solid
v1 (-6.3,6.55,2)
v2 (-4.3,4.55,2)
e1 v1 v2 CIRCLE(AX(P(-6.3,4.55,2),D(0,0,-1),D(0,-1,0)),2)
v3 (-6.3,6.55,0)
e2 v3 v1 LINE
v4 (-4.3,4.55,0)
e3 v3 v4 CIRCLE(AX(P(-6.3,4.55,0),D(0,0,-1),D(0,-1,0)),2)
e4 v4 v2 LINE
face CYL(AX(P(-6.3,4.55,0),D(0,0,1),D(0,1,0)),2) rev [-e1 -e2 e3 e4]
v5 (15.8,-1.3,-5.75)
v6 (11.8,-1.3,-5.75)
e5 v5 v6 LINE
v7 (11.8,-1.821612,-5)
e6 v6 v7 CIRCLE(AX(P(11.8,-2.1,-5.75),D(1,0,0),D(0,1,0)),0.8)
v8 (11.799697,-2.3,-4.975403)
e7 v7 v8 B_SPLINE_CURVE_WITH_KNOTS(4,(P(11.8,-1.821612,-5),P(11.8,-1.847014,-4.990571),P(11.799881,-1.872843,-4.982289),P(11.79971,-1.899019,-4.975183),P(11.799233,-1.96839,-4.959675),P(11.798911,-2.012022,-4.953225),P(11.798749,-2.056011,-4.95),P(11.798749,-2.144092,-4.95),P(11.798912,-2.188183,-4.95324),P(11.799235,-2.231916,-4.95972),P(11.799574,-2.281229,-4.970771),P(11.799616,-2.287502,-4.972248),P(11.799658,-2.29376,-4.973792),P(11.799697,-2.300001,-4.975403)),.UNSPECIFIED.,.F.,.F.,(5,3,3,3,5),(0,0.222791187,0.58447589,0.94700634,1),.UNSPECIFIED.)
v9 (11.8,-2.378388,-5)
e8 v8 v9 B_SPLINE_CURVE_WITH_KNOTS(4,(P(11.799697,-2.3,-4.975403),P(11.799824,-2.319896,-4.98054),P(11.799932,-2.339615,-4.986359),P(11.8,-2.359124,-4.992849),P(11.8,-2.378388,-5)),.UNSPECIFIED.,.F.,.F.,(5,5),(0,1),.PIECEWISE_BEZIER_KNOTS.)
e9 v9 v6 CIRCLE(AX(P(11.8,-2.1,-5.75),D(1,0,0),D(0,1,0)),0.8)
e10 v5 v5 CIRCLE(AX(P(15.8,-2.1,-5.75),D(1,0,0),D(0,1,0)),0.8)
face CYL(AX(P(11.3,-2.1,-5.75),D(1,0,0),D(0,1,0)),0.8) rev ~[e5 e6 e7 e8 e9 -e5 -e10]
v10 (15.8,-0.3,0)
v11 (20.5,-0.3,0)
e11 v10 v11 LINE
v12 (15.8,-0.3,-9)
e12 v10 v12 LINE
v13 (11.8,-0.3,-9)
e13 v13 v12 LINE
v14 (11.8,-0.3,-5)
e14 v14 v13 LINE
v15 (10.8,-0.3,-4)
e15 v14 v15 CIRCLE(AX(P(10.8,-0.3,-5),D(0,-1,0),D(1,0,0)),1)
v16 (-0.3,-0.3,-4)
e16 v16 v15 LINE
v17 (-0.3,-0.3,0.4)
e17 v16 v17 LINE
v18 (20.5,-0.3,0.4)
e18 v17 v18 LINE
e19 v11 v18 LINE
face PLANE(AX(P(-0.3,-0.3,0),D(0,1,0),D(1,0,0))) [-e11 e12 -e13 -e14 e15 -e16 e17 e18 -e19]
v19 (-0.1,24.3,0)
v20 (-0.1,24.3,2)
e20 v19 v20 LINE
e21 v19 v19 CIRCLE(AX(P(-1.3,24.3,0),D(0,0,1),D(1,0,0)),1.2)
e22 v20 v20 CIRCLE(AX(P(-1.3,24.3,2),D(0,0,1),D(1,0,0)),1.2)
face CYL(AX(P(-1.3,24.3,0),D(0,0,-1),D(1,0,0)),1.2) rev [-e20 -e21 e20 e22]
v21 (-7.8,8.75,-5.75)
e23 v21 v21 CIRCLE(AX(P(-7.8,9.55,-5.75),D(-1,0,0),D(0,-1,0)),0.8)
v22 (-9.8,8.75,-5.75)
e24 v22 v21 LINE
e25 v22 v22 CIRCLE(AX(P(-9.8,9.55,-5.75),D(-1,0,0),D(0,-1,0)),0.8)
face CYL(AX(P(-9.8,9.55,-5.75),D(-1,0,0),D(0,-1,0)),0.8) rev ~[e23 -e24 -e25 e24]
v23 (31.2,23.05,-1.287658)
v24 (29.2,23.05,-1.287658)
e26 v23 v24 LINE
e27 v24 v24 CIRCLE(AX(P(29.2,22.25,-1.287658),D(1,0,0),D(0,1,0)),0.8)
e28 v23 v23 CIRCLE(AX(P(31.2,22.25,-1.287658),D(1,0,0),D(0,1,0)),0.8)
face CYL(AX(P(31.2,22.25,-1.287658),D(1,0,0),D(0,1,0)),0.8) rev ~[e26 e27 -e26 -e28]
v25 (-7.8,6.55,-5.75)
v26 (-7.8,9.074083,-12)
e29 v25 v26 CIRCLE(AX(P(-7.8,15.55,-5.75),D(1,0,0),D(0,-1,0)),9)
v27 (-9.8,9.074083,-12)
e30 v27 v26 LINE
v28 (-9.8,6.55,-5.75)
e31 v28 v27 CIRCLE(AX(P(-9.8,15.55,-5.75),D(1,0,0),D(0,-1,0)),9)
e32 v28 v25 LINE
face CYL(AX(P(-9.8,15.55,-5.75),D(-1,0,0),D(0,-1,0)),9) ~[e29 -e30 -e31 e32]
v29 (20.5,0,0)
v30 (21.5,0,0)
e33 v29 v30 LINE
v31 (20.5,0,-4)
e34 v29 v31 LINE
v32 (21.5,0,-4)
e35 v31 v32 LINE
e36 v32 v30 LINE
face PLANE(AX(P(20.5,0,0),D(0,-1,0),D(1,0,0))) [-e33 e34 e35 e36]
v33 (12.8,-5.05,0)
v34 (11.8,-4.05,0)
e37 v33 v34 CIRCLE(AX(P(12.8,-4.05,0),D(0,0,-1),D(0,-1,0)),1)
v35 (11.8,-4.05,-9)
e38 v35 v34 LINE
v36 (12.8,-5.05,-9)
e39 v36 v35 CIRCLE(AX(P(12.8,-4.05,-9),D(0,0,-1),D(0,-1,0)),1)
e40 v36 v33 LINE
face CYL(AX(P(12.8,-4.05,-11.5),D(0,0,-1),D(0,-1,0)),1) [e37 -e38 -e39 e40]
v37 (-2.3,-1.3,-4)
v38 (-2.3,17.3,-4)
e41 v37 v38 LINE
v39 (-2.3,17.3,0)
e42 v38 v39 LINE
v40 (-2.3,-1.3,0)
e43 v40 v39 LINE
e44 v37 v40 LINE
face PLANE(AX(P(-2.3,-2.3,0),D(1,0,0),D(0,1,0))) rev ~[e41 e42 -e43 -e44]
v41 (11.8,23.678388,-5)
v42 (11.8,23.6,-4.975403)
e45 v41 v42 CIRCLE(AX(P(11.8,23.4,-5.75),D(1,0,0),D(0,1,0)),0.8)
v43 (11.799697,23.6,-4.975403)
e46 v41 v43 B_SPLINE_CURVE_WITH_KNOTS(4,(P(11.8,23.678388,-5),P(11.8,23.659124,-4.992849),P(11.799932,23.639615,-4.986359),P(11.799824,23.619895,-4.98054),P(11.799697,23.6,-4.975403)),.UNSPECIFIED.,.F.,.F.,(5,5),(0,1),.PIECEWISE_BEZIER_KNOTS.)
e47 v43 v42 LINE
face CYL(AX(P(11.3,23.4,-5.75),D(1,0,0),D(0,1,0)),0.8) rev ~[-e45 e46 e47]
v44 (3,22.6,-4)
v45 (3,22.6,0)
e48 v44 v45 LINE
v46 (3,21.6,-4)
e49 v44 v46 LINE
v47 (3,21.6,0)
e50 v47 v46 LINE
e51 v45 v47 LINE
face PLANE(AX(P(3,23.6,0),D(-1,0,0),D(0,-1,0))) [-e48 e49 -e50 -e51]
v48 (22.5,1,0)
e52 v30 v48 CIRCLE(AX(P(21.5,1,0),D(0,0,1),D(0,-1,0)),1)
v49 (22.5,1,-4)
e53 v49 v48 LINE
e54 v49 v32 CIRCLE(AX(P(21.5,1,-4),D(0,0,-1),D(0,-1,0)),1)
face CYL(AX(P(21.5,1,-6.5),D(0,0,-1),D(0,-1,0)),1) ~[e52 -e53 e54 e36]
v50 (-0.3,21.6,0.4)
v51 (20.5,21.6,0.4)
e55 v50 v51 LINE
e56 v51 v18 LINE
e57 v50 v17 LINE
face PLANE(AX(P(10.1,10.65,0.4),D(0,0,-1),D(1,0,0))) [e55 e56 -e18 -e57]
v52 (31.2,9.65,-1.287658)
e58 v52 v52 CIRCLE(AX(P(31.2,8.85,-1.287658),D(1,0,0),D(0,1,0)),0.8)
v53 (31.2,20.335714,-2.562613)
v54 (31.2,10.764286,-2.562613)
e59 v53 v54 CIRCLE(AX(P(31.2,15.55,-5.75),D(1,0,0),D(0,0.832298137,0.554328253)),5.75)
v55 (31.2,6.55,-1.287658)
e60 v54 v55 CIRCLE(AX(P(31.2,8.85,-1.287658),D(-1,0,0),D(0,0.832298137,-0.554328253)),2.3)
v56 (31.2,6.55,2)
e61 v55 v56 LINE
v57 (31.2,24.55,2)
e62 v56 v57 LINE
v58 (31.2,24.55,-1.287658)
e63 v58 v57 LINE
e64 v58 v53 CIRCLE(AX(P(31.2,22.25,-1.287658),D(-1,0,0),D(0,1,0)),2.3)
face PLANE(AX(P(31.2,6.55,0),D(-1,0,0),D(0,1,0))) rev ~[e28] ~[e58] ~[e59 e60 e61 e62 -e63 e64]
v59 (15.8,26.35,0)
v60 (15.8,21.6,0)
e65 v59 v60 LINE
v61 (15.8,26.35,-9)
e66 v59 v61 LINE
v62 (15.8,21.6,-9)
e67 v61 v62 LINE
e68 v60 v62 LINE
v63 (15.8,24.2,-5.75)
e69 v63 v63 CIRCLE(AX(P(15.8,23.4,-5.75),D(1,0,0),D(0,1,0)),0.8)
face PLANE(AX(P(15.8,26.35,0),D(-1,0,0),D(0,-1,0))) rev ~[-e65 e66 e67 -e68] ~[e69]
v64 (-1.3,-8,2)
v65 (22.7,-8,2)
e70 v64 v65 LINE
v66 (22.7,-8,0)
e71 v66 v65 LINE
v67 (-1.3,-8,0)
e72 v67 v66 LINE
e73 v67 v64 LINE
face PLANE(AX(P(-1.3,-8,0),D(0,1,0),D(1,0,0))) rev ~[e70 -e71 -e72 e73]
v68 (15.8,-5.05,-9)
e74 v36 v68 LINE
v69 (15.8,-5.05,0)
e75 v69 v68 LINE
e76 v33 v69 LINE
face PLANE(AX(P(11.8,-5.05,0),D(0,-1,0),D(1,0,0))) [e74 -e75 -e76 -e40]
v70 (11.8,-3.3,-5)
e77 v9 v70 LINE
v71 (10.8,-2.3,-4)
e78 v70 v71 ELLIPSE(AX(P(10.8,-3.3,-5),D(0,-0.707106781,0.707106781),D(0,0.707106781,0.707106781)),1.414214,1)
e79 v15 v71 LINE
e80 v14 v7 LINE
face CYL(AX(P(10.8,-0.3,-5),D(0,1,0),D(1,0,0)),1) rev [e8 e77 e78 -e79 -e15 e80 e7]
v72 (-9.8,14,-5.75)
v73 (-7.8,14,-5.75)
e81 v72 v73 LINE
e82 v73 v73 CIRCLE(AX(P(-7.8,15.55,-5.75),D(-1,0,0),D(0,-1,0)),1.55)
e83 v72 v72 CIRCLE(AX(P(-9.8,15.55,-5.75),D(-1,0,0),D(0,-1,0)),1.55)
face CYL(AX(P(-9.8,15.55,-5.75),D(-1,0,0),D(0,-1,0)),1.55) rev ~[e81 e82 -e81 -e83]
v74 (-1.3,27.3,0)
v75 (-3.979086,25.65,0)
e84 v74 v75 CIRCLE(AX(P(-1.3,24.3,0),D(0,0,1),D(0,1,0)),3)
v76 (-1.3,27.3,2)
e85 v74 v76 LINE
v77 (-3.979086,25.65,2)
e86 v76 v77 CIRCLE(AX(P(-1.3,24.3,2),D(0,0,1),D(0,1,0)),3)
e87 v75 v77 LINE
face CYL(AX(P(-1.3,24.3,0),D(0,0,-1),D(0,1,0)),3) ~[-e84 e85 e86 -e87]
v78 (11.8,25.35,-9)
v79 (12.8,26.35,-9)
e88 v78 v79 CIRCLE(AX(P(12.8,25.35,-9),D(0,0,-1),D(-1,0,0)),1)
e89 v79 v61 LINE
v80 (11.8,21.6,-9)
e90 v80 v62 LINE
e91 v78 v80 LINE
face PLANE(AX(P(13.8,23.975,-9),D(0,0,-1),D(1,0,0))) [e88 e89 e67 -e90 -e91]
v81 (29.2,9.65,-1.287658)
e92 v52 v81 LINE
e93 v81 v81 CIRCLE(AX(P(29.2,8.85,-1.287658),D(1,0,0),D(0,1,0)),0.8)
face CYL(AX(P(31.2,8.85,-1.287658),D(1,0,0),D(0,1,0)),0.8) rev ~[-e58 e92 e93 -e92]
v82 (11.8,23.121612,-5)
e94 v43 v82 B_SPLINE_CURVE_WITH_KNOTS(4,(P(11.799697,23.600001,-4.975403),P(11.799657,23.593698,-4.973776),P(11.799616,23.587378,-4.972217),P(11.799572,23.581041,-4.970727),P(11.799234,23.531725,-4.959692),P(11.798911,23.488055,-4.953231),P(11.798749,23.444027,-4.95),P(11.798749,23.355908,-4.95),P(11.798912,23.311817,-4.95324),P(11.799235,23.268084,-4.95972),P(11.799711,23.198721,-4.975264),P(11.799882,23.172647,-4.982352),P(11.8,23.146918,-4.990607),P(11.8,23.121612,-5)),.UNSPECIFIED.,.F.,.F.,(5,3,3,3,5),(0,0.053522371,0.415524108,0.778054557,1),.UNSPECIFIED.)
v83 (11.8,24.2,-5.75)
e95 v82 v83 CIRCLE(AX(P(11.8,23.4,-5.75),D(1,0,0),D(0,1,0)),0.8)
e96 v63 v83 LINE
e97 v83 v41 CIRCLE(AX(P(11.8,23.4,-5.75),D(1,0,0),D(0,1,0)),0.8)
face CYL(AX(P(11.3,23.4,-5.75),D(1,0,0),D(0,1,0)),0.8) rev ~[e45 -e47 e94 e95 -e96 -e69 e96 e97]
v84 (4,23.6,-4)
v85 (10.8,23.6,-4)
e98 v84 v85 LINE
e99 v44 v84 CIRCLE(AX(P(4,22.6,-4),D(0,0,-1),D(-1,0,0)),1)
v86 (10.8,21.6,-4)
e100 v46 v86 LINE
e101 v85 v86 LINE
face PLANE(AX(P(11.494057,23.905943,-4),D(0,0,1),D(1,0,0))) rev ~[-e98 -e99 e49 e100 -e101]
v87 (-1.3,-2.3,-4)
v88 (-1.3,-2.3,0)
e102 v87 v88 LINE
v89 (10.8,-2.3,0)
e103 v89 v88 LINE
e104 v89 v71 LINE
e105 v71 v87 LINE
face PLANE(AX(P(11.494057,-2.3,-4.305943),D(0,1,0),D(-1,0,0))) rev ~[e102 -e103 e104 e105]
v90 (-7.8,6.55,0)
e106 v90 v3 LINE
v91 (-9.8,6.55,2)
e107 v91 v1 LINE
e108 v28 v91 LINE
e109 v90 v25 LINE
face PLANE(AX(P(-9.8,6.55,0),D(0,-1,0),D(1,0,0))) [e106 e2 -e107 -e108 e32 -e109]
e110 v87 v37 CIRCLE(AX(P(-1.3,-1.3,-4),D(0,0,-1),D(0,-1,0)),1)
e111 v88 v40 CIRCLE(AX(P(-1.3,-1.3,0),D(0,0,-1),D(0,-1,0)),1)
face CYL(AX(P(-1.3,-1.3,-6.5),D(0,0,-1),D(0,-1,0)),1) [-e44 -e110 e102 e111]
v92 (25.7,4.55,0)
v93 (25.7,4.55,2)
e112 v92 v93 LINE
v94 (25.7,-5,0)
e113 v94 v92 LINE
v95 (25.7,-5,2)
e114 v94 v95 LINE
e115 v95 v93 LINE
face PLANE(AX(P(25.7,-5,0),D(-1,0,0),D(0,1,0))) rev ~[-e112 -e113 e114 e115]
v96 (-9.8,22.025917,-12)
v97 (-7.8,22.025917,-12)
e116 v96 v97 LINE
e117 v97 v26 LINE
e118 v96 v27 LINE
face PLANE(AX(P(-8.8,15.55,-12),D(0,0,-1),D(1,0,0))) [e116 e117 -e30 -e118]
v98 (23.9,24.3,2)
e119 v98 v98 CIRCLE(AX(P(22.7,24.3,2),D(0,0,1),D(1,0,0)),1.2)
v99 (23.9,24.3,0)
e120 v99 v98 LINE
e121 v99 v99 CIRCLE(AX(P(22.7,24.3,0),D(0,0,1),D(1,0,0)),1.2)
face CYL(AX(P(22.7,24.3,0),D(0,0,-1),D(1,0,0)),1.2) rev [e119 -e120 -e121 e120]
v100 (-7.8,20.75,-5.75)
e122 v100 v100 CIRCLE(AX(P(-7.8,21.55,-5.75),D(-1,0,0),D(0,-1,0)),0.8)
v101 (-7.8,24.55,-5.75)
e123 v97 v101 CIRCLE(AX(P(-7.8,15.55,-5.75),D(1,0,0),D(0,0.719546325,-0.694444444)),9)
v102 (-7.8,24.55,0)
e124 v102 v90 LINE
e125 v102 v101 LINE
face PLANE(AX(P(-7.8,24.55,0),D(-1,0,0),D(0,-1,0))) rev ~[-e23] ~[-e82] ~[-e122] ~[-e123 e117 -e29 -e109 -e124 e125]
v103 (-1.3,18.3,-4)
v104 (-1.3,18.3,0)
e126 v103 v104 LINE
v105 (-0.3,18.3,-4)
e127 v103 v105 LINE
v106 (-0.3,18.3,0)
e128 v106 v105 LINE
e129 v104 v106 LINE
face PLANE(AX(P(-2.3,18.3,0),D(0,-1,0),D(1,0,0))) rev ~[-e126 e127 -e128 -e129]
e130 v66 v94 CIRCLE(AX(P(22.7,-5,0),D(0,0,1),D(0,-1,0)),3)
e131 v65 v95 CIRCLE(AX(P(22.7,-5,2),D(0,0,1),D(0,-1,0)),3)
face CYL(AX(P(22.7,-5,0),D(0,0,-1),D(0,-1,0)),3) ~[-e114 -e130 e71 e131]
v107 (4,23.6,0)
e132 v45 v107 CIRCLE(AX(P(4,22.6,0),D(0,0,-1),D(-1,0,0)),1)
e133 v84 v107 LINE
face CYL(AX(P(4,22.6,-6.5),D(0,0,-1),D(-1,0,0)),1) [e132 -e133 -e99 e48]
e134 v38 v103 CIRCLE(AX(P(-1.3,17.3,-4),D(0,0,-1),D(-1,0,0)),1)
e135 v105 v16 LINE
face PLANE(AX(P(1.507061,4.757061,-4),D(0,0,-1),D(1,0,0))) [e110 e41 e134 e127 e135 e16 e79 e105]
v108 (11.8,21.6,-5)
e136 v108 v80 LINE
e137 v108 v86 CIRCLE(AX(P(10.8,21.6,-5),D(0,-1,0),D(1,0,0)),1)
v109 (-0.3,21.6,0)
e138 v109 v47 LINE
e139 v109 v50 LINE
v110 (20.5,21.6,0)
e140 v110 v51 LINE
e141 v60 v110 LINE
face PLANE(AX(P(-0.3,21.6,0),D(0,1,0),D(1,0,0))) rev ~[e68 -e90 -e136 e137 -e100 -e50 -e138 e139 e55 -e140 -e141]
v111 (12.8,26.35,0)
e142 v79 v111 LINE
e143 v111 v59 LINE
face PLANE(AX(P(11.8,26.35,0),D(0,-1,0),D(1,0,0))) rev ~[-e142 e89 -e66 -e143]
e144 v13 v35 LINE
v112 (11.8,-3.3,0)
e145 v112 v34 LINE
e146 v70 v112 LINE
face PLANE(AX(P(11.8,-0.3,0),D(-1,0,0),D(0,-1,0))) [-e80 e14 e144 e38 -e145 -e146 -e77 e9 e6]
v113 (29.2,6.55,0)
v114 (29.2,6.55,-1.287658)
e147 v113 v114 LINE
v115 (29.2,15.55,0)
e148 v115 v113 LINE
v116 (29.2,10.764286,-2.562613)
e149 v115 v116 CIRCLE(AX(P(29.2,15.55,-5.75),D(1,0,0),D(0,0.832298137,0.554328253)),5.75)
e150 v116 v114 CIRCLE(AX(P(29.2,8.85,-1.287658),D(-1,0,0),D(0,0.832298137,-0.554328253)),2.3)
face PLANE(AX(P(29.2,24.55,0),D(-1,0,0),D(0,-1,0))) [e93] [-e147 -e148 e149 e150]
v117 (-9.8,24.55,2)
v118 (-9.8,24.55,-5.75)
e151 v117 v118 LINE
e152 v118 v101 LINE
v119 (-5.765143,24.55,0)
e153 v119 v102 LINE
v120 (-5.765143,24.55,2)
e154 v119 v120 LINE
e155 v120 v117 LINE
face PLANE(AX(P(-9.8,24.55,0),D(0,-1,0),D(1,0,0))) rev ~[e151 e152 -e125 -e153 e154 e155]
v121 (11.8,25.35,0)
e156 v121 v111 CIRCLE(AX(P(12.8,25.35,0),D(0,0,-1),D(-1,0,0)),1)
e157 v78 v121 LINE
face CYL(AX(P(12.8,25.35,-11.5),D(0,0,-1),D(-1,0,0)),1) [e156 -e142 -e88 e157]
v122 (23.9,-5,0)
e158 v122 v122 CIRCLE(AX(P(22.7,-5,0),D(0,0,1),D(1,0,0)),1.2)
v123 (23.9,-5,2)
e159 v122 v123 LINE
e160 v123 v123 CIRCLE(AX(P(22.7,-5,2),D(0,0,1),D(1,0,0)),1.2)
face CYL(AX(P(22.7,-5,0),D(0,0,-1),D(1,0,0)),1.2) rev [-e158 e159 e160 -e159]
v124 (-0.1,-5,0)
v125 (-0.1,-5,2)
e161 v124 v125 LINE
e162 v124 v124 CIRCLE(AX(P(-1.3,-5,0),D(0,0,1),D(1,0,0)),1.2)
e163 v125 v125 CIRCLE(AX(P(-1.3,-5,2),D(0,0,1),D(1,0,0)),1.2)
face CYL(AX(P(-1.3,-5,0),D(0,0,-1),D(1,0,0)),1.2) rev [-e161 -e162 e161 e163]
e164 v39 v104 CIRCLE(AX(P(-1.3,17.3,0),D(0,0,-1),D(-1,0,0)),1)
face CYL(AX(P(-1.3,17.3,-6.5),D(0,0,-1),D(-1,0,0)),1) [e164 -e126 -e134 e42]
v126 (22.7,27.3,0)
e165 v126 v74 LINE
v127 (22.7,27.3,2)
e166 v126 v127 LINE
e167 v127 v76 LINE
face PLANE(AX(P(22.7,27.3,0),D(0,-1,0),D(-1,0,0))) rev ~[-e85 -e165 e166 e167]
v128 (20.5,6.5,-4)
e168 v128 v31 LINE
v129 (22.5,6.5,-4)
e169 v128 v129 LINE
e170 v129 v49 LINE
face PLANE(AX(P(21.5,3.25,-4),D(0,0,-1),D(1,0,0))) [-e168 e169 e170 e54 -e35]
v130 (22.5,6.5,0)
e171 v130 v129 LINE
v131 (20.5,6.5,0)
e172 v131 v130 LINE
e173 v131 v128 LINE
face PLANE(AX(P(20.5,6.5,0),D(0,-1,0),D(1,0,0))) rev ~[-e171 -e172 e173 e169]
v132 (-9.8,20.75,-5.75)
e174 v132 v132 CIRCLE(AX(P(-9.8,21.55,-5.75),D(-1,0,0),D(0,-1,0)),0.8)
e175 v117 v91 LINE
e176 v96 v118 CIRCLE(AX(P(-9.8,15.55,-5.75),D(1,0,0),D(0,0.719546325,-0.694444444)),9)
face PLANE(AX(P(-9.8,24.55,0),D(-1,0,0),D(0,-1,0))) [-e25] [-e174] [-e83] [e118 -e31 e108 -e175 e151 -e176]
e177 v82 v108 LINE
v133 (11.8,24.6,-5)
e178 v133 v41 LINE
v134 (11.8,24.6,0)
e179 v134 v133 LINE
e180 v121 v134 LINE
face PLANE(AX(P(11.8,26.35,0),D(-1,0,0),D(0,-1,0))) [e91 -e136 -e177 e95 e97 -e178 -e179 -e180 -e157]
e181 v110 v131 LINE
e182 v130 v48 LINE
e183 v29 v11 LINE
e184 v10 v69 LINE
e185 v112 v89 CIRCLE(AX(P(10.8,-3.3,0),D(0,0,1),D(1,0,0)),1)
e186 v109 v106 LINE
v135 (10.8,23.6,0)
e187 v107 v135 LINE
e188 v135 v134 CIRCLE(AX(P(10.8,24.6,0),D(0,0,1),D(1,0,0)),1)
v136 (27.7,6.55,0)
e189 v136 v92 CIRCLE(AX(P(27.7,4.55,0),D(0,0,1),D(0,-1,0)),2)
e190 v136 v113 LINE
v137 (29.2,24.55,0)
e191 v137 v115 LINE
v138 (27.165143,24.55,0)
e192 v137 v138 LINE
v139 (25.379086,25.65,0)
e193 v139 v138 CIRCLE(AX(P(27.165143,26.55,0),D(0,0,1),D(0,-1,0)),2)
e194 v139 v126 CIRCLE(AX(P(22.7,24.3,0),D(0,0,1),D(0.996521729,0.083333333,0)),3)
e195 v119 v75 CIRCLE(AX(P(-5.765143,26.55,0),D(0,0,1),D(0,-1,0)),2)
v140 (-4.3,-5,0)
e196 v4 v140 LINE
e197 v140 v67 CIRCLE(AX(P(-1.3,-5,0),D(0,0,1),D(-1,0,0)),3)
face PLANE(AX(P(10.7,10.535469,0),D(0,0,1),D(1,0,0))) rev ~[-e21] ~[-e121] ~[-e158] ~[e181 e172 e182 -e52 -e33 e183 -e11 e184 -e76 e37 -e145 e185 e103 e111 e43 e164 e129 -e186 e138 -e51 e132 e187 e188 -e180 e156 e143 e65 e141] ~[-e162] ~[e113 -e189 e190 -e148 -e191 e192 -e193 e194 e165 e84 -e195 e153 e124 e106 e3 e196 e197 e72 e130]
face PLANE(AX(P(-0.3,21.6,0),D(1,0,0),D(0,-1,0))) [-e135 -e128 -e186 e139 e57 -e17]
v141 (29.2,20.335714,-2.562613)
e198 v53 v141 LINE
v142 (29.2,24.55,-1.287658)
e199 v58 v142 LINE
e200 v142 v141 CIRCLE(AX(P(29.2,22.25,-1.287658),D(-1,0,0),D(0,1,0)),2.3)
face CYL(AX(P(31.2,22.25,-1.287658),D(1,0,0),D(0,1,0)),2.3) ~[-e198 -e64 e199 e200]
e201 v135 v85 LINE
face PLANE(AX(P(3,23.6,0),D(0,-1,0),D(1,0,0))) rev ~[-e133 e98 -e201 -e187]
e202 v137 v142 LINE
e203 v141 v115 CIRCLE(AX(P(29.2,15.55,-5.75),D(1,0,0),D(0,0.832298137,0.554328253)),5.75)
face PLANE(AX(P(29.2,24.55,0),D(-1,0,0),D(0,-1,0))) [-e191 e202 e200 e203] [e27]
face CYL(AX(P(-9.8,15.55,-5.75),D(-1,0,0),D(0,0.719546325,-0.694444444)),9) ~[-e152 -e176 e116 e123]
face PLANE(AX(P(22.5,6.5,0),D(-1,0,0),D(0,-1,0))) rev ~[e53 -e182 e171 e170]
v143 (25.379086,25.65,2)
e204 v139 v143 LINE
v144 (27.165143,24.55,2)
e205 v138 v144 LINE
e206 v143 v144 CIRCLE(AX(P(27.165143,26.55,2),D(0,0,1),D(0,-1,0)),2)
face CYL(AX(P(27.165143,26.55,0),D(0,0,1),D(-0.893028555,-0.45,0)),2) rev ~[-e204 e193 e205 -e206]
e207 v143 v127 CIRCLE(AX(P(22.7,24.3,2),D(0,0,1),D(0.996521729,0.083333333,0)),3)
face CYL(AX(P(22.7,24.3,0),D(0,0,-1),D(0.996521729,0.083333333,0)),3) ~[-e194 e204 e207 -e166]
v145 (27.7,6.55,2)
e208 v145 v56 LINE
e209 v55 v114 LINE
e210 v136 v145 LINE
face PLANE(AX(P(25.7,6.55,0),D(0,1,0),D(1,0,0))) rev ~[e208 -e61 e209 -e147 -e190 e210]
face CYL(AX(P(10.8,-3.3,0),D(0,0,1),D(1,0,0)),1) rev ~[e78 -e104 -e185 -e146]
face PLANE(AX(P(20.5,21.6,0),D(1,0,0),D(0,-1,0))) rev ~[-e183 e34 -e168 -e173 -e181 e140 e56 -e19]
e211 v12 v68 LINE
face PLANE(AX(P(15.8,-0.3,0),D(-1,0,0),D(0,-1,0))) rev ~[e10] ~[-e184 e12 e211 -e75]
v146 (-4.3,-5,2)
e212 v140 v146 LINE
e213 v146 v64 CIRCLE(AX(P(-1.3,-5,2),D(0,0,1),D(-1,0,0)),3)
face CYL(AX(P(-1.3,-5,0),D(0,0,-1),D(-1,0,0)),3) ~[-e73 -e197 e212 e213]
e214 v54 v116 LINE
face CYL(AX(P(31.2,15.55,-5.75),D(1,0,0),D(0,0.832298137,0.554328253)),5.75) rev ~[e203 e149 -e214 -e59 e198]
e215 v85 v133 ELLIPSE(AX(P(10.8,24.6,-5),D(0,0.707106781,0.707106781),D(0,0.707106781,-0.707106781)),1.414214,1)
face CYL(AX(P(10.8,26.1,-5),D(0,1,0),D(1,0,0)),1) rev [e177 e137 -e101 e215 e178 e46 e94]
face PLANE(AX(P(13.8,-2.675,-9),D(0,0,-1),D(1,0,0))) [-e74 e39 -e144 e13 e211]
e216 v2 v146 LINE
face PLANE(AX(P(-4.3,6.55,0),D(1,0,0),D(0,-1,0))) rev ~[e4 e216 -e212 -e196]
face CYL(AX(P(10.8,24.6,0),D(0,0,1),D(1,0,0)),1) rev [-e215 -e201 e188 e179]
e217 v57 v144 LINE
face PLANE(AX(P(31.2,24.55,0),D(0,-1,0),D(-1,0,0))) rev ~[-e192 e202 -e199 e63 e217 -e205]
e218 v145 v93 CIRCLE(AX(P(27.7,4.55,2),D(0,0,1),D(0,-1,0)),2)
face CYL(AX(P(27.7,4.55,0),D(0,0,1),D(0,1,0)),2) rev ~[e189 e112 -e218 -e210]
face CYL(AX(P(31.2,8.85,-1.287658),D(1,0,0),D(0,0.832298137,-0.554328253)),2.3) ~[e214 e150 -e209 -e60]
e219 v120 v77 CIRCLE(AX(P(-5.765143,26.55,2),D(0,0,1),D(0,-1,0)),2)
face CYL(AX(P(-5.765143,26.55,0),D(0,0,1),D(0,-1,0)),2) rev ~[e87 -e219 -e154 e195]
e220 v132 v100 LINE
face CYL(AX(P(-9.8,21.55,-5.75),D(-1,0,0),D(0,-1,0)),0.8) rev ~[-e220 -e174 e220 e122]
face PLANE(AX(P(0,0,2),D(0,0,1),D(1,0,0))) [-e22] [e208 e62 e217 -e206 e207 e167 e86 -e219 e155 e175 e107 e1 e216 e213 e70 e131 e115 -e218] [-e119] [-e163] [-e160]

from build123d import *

# Parameters (mm, degrees)
F1_R          = 1.2
F2_DEPTH      = 2
F3_R          = 2
F4_W          = 4
F4_H          = 4.75
F5_DEPTH      = 9
F6_W          = 8.8
F6_H          = 2
F6_W_2        = 2
F6_H_2        = 6.5
F7_DEPTH      = 4
F8_R          = 0.8
F9_DEPTH      = 4
F10_T4_DEPTH  = 2
F10_S5_R      = 0.8
F10_T6_DEPTH  = 3
F10_T10_DEPTH = 6.5
F10_T15_DEPTH = 6.5
F10_T20_DEPTH = 2
F10_S21_R     = 0.8
F10_T22_DEPTH = 3
F10_T27_DEPTH = 6.5
F10_S29_R     = 0.8
F10_T30_DEPTH = 5
F10_T33_DEPTH = 4.5
F10_T40_DEPTH = 4.5
F10_T44_DEPTH = 6.5
F10_S46_R     = 0.8
F10_T47_DEPTH = 5
F10_T49_DEPTH = 6.5
F10_T51_DEPTH = 11.5
F11_W         = 2
F11_H         = 18
F12_DEPTH     = 12
F13_R         = 1.55
F13_R_2       = 0.8
F14_DEPTH     = 2
F15_R         = 0.8
F16_DEPTH     = 2
F18_W         = 20.8
F18_H         = 21.9
F19_DEPTH     = 0.4


# Not quite as in the source:
# - a fillet or chamfer that OpenCascade refuses, or shapes differently, is made with other operations: its cross-section is extruded or revolved along the edge and cut away or added
# - two fillets or chamfers of one size are made in one step


with BuildPart() as f2:
    # F1 (on Top) → F2 (new body)
    with BuildSketch(Plane.XY):
        with BuildLine():
            Line((-4.2895651858, 24.55), (-9.8, 24.55))
            Line((-9.8, 24.55), (-9.8, 6.55))
            Line((-9.8, 6.55), (-4.3, 6.55))
            Line((-4.3, 6.55), (-4.3, -5))
            ThreePointArc((-4.3, -5), (-3.4213203436, -7.1213203436), (-1.3, -8))
            Line((-1.3, -8), (22.7, -8))
            ThreePointArc((22.7, -8), (24.8213203436, -7.1213203436), (25.7, -5))
            Line((25.7, -5), (25.7, 6.55))
            Line((25.7, 6.55), (31.2, 6.55))
            Line((31.2, 6.55), (31.2, 24.55))
            Line((31.2, 24.55), (25.6895651858, 24.55))
            ThreePointArc((25.6895651858, 24.55), (24.7310096012, 26.5079402166), (22.7, 27.3))
            Line((22.7, 27.3), (-1.3, 27.3))
            ThreePointArc((-1.3, 27.3), (-3.3310096012, 26.5079402166), (-4.2895651858, 24.55))
        make_face()
        with Locations((-1.3, -5)):
            Circle(F1_R, mode=Mode.SUBTRACT)
        with Locations((22.7, -5)):
            Circle(F1_R, mode=Mode.SUBTRACT)
        with Locations((-1.3, 24.3)):
            Circle(F1_R, mode=Mode.SUBTRACT)
        with Locations((22.7, 24.3)):
            Circle(F1_R, mode=Mode.SUBTRACT)
    extrude(amount=F2_DEPTH)

    # F3
    f3_edges = [f2.edges().sort_by_distance(p)[0] for p in [
        (-4.289565, 24.55, 1),
        (-4.3, 6.55, 1),
        (25.7, 6.55, 1),
        (25.689565, 24.55, 1),
    ]]
    fillet(f3_edges, radius=F3_R)

    # F4 (on face) → F5 (join)
    with BuildSketch(Plane(origin=(0, 0, 0), x_dir=(1, 0, 0), z_dir=(0, 0, -1))):
        with Locations((13.8, 2.675)):
            Rectangle(F4_W, F4_H)
        with Locations((13.8, -23.975)):
            Rectangle(F4_W, F4_H)
    extrude(amount=F5_DEPTH)

    # F6 (on face) → F7 (join)
    with BuildSketch(Plane(origin=(0, 0, 0), x_dir=(1, 0, 0), z_dir=(0, 0, -1))):
        Polygon((-2.3, -18.3), (-0.3, -18.3), (-0.3, 0.3), (11.8, 0.3), (11.8, 2.3), (-2.3, 2.3), align=None)
        with Locations((7.4, -22.6)):
            Rectangle(F6_W, F6_H)
        with Locations((21.5, -3.25)):
            Rectangle(F6_W_2, F6_H_2)
    extrude(amount=F7_DEPTH)

    # F8 (on face) → F9 (cut, through all)
    with BuildSketch(Plane.YZ.offset(15.8)):
        with Locations((23.4, -5.75)):
            Circle(F8_R)
        with Locations((-2.1, -5.75)):
            Circle(F8_R)
    extrude(amount=-F9_DEPTH, mode=Mode.SUBTRACT)

    # F10: fillet of radius 1 on 10 edges, made by hand


with BuildPart() as f10_tool2:
    # F10_s3 → F10_t4 (new body)
    with BuildSketch(Plane.XZ.offset(0.3)):
        with BuildLine():
            ThreePointArc((11.8, -5), (11.5071067812, -4.2928932188), (10.8, -4))
            Line((10.8, -4), (11.8, -4))
            Line((11.8, -4), (11.8, -5))
        make_face()
    extrude(amount=F10_T4_DEPTH)

    # F10_s5 → F10_t6 (cut, symmetric)
    with BuildSketch(Plane.YZ.offset(11.3)):
        with Locations((-2.1, -5.75)):
            Circle(F10_S5_R)
    extrude(amount=F10_T6_DEPTH, both=True, mode=Mode.SUBTRACT)


with BuildPart() as f2_1:
    add(f2.part)

    # F10_t1: union F10_tool2
    add(f10_tool2.part)


with BuildPart() as f10_tool8:
    # F10_s9 → F10_t10 (new body)
    with BuildSketch(Plane.XY.offset(2.5)):
        with BuildLine():
            ThreePointArc((11.8, -3.3), (11.5071067812, -2.5928932188), (10.8, -2.3))
            Line((10.8, -2.3), (11.8, -2.3))
            Line((11.8, -2.3), (11.8, -3.3))
        make_face()
    extrude(amount=-F10_T10_DEPTH)

    split(bisect_by=Plane.XY.offset(2), keep=Keep.BOTTOM)


with BuildPart() as f2_2:
    add(f2_1.part)

    # F10_t7: union F10_tool8
    add(f10_tool8.part)


with BuildPart() as f10_tool13:
    # F10_s14 → F10_t15 (new body)
    with BuildSketch(Plane.XY.offset(2.5)):
        with BuildLine():
            ThreePointArc((11.8, 24.6), (11.5071067812, 23.8928932188), (10.8, 23.6))
            Line((10.8, 23.6), (11.8, 23.6))
            Line((11.8, 23.6), (11.8, 24.6))
        make_face()
    extrude(amount=-F10_T15_DEPTH)

    split(bisect_by=Plane.XY.offset(2), keep=Keep.BOTTOM)


with BuildPart() as f2_3:
    add(f2_2.part)

    # F10_t12: union F10_tool13
    add(f10_tool13.part)


with BuildPart() as f10_tool18:
    # F10_s19 → F10_t20 (new body)
    with BuildSketch(Plane.XZ.offset(-23.6)):
        with BuildLine():
            ThreePointArc((11.8, -5), (11.5071067812, -4.2928932188), (10.8, -4))
            Line((10.8, -4), (11.8, -4))
            Line((11.8, -4), (11.8, -5))
        make_face()
    extrude(amount=F10_T20_DEPTH)

    # F10_s21 → F10_t22 (cut, symmetric)
    with BuildSketch(Plane.YZ.offset(11.3)):
        with Locations((23.4, -5.75)):
            Circle(F10_S21_R)
    extrude(amount=F10_T22_DEPTH, both=True, mode=Mode.SUBTRACT)


with BuildPart() as f2_4:
    add(f2_3.part)

    # F10_t17: union F10_tool18
    add(f10_tool18.part)


with BuildPart() as f10_tool25:
    # F10_s26 → F10_t27 (new body)
    with BuildSketch(Plane.XY):
        with BuildLine():
            ThreePointArc((11.8, -3.3), (11.5071067812, -2.5928932188), (10.8, -2.3))
            Line((10.8, -2.3), (11.8, -2.3))
            Line((11.8, -2.3), (11.8, -3.3))
        make_face()
    extrude(amount=-F10_T27_DEPTH)

    split(bisect_by=Plane.XY.offset(-4), keep=Keep.BOTTOM)

    # F10_s29 → F10_t30 (cut, symmetric)
    with BuildSketch(Plane.YZ.offset(11.3)):
        with Locations((-2.1, -5.75)):
            Circle(F10_S29_R)
    extrude(amount=F10_T30_DEPTH, both=True, mode=Mode.SUBTRACT)


with BuildPart() as f10_tool31:
    # F10_s32 → F10_t33 (new body)
    with BuildSketch(Plane.XZ.offset(0.3)):
        with BuildLine():
            ThreePointArc((11.8, -5), (11.5071067812, -4.2928932188), (10.8, -4))
            Line((10.8, -4), (11.8, -4))
            Line((11.8, -4), (11.8, -5))
        make_face()
    extrude(amount=F10_T33_DEPTH)

    split(bisect_by=Plane.XZ.offset(2.3), keep=Keep.TOP)


with BuildPart() as f10_tool25_1:
    add(f10_tool25.part)

    # F10_t35: intersect F10_tool31
    add(f10_tool31.part, mode=Mode.INTERSECT)


with BuildPart() as f2_5:
    add(f2_4.part)

    # F10_t23: union F10_tool25
    add(f10_tool25_1.part)


with BuildPart() as f10_tool38:
    # F10_s39 → F10_t40 (new body)
    with BuildSketch(Plane.XZ.offset(-26.1)):
        with BuildLine():
            ThreePointArc((11.8, -5), (11.5071067812, -4.2928932188), (10.8, -4))
            Line((10.8, -4), (11.8, -4))
            Line((11.8, -4), (11.8, -5))
        make_face()
    extrude(amount=F10_T40_DEPTH)

    split(bisect_by=Plane.XZ.offset(-23.6), keep=Keep.BOTTOM)


with BuildPart() as f10_tool42:
    # F10_s43 → F10_t44 (new body)
    with BuildSketch(Plane.XY):
        with BuildLine():
            ThreePointArc((11.8, 24.6), (11.5071067812, 23.8928932188), (10.8, 23.6))
            Line((10.8, 23.6), (11.8, 23.6))
            Line((11.8, 23.6), (11.8, 24.6))
        make_face()
    extrude(amount=-F10_T44_DEPTH)

    split(bisect_by=Plane.XY.offset(-4), keep=Keep.BOTTOM)

    # F10_s46 → F10_t47 (cut, symmetric)
    with BuildSketch(Plane.YZ.offset(11.3)):
        with Locations((23.4, -5.75)):
            Circle(F10_S46_R)
    extrude(amount=F10_T47_DEPTH, both=True, mode=Mode.SUBTRACT)


with BuildPart() as f10_tool38_1:
    add(f10_tool38.part)

    # F10_t48: intersect F10_tool42
    add(f10_tool42.part, mode=Mode.INTERSECT)


with BuildPart() as f2_6:
    add(f2_5.part)

    # F10_t36: union F10_tool38
    add(f10_tool38_1.part)

    # F10_s50 → F10_t49 (cut)
    with BuildSketch(Plane.XY.offset(-6.5)):
        with BuildLine():
            ThreePointArc((-1.3, -2.3), (-2.0071067812, -2.0071067812), (-2.3, -1.3))
            Line((-2.3, -1.3), (-2.3, -2.3))
            Line((-2.3, -2.3), (-1.3, -2.3))
        make_face()
        with BuildLine():
            ThreePointArc((-2.3, 17.3), (-2.0071067812, 18.0071067812), (-1.3, 18.3))
            Line((-1.3, 18.3), (-2.3, 18.3))
            Line((-2.3, 18.3), (-2.3, 17.3))
        make_face()
        with BuildLine():
            ThreePointArc((3, 22.6), (3.2928932188, 23.3071067812), (4, 23.6))
            Line((4, 23.6), (3, 23.6))
            Line((3, 23.6), (3, 22.6))
        make_face()
        with BuildLine():
            ThreePointArc((21.5, 0), (22.2071067812, 0.2928932188), (22.5, 1))
            Line((22.5, 1), (22.5, 0))
            Line((22.5, 0), (21.5, 0))
        make_face()
    extrude(amount=F10_T49_DEPTH, mode=Mode.SUBTRACT)

    # F10_s52 → F10_t51 (cut)
    with BuildSketch(Plane.XY.offset(-11.5)):
        with BuildLine():
            ThreePointArc((11.8, 25.35), (12.0928932188, 26.0571067812), (12.8, 26.35))
            Line((12.8, 26.35), (11.8, 26.35))
            Line((11.8, 26.35), (11.8, 25.35))
        make_face()
        with BuildLine():
            ThreePointArc((12.8, -5.05), (12.0928932188, -4.7571067812), (11.8, -4.05))
            Line((11.8, -4.05), (11.8, -5.05))
            Line((11.8, -5.05), (12.8, -5.05))
        make_face()
    extrude(amount=F10_T51_DEPTH, mode=Mode.SUBTRACT)

    # F11 (on face) → F12 (join)
    with BuildSketch(Plane(origin=(0, 0, 0), x_dir=(1, 0, 0), z_dir=(0, 0, -1))):
        with Locations((-8.8, -15.55)):
            Rectangle(F11_W, F11_H)
        with Locations((30.2, -15.55)):
            Rectangle(F11_W, F11_H)
    extrude(amount=F12_DEPTH)

    # F13 (on face) → F14 (cut, through all)
    with BuildSketch(Plane(origin=(-9.8, 0, 0), x_dir=(0, -1, 0), z_dir=(-1, 0, 0))):
        with Locations((-15.55, -5.75)):
            Circle(F13_R)
        with Locations((-21.55, -5.75)):
            Circle(F13_R_2)
        with Locations((-9.55, -5.75)):
            Circle(F13_R_2)
        with BuildLine():
            ThreePointArc((-22.0259169235, -12), (-23.8951558497, -9.1202186642), (-24.55, -5.75))
            Line((-24.55, -5.75), (-24.55, -12))
            Line((-24.55, -12), (-22.0259169235, -12))
        make_face()
        with BuildLine():
            ThreePointArc((-6.55, -5.75), (-7.2048441503, -9.1202186642), (-9.0740830765, -12))
            Line((-9.0740830765, -12), (-6.55, -12))
            Line((-6.55, -12), (-6.55, -5.75))
        make_face()
    extrude(amount=-F14_DEPTH, mode=Mode.SUBTRACT)

    # F15 (on face) → F16 (cut, through all)
    with BuildSketch(Plane.YZ.offset(31.2)):
        with BuildLine():
            ThreePointArc((24.55, -1.2876575658), (22.9160115829, -3.4891181199), (20.3357142857, -2.562612547))
            ThreePointArc((20.3357142857, -2.562612547), (15.55, 0), (10.7642857143, -2.562612547))
            ThreePointArc((10.7642857143, -2.562612547), (8.1839884171, -3.4891181199), (6.55, -1.2876575658))
            Line((6.55, -1.2876575658), (6.55, -12))
            Line((6.55, -12), (24.55, -12))
            Line((24.55, -12), (24.55, -1.2876575658))
        make_face()
        with Locations((8.85, -1.2876575658)):
            Circle(F15_R)
        with Locations((22.25, -1.2876575658)):
            Circle(F15_R)
    extrude(amount=-F16_DEPTH, mode=Mode.SUBTRACT)

    # F18 (on face) → F19 (cut)
    with BuildSketch(Plane(origin=(0, 0, 0), x_dir=(1, 0, 0), z_dir=(0, 0, -1))):
        with Locations((10.1, -10.65)):
            Rectangle(F18_W, F18_H)
    extrude(amount=-F19_DEPTH, mode=Mode.SUBTRACT)


solid = f2_6.part
